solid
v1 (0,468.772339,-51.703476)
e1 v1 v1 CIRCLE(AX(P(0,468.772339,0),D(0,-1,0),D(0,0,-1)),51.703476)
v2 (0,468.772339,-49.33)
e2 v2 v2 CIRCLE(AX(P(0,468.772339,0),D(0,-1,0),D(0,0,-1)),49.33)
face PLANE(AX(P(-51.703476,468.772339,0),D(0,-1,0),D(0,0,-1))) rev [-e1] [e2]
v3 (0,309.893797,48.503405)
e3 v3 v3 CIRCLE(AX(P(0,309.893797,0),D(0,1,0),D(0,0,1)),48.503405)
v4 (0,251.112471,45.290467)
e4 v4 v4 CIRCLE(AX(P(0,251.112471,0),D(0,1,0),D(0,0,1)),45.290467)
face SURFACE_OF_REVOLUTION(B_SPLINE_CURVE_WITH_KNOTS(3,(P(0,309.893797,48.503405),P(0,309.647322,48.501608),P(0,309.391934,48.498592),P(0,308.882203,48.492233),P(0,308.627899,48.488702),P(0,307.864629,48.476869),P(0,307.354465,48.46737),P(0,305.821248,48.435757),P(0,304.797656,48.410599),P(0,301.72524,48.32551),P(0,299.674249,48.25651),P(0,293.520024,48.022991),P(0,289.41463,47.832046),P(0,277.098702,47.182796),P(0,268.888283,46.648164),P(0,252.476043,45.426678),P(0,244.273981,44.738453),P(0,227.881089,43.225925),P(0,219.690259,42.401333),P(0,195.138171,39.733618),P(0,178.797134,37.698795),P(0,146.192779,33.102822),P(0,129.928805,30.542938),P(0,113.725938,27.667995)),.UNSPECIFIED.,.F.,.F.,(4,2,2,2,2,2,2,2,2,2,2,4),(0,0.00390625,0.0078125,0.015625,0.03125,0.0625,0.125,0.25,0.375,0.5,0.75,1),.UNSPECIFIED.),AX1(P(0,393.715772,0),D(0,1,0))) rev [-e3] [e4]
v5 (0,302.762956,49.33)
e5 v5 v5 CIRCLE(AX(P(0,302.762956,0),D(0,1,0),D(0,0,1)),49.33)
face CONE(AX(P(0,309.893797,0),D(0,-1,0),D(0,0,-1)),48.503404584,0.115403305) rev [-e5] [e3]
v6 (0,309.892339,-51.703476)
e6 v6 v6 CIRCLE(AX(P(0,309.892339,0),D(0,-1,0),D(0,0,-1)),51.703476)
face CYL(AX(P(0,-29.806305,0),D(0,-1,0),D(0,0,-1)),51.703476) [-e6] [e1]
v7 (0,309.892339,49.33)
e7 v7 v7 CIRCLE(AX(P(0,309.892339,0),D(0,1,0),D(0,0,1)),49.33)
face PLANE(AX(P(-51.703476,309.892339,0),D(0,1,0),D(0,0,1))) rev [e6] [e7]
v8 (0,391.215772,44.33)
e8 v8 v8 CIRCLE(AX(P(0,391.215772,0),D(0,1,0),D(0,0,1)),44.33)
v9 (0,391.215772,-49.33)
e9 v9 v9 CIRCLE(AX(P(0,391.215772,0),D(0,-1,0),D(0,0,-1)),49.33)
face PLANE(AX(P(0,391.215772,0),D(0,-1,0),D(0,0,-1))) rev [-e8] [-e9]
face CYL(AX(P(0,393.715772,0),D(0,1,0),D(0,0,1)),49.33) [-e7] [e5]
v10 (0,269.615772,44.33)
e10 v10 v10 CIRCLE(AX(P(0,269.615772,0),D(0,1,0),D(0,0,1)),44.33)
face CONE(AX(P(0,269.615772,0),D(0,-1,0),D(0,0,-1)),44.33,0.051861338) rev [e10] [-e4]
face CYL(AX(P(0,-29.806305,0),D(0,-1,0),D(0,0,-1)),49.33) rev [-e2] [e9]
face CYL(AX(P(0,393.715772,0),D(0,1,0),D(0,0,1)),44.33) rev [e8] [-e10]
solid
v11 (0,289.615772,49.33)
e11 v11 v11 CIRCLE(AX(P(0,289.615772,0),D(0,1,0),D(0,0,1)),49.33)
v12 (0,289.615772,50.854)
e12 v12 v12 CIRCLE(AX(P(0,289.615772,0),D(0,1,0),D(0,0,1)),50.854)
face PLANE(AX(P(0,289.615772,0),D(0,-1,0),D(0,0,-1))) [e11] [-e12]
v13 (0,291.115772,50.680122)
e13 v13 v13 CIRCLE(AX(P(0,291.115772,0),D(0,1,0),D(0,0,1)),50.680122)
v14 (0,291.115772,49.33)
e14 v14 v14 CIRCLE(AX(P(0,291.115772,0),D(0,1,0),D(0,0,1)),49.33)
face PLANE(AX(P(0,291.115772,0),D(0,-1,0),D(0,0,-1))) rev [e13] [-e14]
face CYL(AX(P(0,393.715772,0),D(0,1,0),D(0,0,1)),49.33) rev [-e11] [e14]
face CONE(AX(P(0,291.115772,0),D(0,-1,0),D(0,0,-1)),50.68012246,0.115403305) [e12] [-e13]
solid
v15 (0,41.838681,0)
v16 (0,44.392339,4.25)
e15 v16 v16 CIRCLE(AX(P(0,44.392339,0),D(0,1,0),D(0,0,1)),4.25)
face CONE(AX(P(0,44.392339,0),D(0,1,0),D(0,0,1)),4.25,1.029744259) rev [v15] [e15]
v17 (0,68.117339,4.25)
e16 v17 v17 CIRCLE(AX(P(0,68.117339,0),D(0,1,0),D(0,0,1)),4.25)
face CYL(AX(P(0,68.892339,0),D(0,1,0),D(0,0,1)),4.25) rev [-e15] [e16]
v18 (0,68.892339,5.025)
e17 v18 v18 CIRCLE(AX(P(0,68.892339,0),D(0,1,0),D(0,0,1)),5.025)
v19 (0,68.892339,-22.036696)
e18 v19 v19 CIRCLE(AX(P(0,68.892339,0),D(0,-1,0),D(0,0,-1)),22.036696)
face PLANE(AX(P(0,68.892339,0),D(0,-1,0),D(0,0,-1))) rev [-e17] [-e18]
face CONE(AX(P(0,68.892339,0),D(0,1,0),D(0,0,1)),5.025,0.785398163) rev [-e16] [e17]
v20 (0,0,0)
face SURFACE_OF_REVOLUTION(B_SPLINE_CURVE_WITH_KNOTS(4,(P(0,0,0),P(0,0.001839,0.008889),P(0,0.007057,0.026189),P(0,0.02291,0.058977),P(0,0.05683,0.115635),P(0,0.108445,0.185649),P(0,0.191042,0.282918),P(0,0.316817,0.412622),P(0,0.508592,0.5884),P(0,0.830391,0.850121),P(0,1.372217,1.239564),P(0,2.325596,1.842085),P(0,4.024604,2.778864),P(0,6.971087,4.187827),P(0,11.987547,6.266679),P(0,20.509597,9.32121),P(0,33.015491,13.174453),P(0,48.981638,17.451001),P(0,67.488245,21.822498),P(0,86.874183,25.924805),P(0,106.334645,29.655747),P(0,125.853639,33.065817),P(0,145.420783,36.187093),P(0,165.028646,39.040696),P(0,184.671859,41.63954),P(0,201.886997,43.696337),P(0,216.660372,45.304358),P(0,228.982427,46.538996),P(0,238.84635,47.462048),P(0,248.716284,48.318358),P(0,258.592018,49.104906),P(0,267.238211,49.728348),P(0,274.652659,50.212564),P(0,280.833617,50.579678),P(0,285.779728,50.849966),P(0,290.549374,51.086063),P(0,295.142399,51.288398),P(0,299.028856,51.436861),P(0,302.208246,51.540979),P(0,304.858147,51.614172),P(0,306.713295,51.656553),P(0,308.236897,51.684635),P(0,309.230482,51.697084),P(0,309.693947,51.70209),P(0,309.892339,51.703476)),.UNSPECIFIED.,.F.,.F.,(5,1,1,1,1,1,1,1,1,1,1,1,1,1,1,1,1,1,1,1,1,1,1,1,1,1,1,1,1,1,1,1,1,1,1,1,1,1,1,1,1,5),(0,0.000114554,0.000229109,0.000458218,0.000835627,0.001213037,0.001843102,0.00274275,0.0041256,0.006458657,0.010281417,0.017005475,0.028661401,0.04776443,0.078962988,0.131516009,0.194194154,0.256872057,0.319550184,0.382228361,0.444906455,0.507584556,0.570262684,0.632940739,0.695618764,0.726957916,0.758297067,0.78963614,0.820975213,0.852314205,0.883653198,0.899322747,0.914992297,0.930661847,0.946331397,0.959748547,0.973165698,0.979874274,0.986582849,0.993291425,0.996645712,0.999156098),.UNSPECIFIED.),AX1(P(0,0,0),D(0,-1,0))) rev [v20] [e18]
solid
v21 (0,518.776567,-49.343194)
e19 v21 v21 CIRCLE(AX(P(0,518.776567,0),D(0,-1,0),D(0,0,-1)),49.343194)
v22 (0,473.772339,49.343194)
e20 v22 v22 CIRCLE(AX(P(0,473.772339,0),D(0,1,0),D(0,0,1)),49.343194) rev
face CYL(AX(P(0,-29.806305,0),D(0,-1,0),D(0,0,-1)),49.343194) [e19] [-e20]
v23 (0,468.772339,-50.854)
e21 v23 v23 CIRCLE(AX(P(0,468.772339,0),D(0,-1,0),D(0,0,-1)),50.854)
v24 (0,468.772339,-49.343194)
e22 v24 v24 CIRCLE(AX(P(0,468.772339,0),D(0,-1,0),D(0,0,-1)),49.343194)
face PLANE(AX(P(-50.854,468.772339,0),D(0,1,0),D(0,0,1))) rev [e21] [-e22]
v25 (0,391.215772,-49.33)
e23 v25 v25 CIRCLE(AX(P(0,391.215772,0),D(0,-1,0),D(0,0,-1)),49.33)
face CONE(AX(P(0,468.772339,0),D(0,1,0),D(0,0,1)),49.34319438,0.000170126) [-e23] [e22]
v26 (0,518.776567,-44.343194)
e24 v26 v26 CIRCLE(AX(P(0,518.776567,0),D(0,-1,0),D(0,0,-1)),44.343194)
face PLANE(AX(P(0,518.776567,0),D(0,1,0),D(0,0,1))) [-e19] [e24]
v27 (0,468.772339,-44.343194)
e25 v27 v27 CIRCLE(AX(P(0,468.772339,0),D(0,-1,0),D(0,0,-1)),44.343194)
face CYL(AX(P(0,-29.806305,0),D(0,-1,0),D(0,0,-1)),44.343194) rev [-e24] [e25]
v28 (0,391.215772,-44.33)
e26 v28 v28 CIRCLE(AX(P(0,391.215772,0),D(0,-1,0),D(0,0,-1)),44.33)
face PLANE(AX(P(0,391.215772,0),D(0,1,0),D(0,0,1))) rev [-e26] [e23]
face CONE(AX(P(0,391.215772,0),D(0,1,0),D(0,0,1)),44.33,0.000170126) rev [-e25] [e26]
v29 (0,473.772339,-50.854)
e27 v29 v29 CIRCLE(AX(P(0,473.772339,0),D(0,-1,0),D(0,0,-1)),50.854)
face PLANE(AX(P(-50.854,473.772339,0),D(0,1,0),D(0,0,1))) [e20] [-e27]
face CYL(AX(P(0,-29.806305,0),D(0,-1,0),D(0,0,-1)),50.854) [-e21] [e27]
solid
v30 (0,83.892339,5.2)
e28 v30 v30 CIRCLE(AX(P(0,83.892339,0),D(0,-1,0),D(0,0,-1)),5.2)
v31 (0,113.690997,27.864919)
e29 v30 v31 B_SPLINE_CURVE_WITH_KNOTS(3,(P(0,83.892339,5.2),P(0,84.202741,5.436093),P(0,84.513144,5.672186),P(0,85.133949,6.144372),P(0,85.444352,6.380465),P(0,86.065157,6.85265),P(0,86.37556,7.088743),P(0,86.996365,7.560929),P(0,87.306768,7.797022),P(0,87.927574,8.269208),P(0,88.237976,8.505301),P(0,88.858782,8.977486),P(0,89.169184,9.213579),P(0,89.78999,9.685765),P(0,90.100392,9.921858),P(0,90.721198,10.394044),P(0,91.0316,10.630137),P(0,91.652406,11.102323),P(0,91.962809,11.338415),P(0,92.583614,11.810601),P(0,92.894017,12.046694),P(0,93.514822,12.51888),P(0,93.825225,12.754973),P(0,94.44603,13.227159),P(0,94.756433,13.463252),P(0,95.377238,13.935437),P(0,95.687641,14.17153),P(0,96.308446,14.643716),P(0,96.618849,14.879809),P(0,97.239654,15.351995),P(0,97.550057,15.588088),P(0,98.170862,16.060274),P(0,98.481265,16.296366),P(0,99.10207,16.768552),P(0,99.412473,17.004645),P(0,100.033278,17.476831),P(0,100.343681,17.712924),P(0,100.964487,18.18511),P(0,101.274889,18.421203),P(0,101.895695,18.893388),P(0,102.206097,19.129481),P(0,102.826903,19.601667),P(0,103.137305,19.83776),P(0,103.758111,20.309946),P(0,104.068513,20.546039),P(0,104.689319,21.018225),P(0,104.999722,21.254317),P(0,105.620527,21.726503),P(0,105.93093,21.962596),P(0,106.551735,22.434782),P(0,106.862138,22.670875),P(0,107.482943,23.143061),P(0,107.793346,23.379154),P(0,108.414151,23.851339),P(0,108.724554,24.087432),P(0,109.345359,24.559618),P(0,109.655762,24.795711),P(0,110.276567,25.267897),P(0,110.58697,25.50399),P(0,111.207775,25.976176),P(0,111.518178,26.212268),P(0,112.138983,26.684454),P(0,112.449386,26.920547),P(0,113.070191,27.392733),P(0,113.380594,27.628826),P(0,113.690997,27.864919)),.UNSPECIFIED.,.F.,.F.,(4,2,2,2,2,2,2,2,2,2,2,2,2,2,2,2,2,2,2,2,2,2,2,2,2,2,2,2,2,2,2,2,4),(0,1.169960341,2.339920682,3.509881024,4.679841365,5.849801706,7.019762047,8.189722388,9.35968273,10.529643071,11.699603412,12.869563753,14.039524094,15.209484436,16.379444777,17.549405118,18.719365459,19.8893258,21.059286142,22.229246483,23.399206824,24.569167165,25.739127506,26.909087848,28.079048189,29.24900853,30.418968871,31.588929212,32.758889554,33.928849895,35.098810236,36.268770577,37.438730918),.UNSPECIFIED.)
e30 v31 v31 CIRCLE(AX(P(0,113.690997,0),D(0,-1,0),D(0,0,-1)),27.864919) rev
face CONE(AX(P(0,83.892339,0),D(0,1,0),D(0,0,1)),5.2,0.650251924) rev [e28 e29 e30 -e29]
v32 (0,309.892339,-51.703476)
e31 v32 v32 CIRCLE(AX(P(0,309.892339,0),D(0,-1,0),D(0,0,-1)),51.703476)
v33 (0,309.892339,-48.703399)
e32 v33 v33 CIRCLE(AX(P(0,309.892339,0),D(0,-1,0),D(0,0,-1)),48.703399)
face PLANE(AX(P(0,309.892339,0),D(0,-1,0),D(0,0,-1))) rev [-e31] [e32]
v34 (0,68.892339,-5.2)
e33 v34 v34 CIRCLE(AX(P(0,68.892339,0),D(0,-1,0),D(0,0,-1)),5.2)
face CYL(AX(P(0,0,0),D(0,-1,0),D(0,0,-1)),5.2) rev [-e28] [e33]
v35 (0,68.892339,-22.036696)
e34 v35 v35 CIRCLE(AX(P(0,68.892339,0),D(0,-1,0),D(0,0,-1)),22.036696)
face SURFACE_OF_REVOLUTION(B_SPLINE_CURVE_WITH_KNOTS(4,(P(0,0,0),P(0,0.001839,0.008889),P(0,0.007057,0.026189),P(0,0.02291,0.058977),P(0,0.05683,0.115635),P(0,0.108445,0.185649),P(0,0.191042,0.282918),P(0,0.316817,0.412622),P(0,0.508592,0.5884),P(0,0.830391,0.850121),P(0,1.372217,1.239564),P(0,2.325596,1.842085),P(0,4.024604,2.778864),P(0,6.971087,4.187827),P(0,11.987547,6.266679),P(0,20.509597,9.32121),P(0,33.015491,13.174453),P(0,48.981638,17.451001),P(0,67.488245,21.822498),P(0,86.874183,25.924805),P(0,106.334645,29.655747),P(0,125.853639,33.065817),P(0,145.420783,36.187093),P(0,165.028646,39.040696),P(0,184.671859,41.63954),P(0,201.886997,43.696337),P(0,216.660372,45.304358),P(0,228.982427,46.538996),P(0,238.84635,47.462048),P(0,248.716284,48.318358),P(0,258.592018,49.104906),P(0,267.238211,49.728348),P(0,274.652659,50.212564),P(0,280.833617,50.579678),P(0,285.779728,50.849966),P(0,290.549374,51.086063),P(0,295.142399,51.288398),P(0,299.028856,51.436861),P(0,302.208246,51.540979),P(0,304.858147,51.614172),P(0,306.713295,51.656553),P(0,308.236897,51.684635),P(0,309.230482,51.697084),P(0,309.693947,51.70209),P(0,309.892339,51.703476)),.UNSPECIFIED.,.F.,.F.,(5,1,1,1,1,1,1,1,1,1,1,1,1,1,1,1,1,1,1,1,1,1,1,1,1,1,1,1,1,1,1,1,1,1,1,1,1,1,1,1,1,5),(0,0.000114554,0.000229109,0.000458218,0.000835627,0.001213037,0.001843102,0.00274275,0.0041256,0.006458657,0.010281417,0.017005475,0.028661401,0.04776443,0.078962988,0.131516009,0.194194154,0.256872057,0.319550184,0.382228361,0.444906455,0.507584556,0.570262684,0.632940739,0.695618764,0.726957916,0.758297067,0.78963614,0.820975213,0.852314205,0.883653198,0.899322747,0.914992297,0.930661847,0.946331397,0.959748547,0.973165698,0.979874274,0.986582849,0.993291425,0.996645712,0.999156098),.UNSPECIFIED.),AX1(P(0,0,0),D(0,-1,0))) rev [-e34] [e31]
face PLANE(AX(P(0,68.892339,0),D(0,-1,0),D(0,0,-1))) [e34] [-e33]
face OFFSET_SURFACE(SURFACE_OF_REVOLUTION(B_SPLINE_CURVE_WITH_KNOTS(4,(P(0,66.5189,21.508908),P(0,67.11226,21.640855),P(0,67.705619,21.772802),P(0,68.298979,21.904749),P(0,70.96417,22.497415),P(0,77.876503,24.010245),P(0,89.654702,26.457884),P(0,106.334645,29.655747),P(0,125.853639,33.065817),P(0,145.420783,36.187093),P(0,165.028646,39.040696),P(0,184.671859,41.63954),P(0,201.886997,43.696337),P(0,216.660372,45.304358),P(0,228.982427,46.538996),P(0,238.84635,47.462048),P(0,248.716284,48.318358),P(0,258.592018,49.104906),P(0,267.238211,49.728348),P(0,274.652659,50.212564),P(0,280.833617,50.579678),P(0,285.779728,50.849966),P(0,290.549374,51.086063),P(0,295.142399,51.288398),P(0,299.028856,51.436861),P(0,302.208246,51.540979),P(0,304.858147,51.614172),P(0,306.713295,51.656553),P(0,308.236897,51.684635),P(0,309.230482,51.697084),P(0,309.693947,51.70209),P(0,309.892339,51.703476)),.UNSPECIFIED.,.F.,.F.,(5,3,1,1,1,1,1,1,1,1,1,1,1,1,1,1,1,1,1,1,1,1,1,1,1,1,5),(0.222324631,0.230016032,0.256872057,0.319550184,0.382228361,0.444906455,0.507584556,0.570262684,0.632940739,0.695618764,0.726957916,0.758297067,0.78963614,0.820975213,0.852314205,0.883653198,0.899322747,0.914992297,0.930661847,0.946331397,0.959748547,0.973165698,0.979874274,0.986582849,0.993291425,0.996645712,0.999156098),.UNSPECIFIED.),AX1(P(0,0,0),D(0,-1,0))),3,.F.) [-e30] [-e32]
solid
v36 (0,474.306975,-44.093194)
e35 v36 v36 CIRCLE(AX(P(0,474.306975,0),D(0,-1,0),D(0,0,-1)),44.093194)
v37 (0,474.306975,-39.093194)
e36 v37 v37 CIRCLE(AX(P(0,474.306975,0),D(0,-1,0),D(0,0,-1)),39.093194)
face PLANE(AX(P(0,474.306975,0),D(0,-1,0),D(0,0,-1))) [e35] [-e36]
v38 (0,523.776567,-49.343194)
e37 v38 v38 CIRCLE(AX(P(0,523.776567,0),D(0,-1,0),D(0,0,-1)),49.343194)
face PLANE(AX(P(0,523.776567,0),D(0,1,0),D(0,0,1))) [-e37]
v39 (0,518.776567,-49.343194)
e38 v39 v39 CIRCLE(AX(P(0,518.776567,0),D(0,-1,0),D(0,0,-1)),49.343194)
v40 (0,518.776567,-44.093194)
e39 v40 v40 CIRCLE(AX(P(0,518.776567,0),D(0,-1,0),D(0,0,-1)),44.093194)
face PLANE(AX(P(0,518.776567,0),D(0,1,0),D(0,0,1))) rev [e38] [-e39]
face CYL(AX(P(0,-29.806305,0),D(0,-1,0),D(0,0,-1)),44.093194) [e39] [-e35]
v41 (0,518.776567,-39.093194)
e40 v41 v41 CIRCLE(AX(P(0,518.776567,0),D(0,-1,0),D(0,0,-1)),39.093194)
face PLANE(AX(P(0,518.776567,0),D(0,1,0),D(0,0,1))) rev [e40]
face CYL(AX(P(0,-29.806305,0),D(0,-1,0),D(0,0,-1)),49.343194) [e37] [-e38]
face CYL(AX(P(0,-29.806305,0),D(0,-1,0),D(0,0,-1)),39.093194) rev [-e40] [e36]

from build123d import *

# Parameters (mm, degrees)
SHELL3_T              = -3
REVOLVE10_START       = 309.892338598
REVOLVE10_OUTLINE_R   = 51.703475653
REVOLVE10_OUTLINE_R_2 = 49.33
REVOLVE10_DEPTH       = 158.88
SKETCH19_W            = 5
SKETCH19_H            = 49.34319438
SKETCH19_W_2          = 44.469592032
SKETCH19_H_2          = 5


# Read off the part's stored shape, not the designer's step: Revolve6, Revolve10, Revolve12
with BuildPart() as part:
    # Sketch1 → Revolve2 (revolve)
    with BuildSketch(Plane.YZ):
        with BuildLine():
            Line((68.892338598, 22.03669608), (68.892338598, 0))
            Line((68.892338598, 0), (309.892338598, 0))
            Line((309.892338598, 0), (309.892338598, 51.703475653))
            add(Edge.make_bspline(
                [(68.892338598, 22.036696078), (70.96416969, 22.497415108), (77.876502823, 24.010245465), (89.654701691, 26.457883592), (106.334645431, 29.655747436), (125.853639326, 33.065816617), (145.420783183, 36.187092783), (165.028645768, 39.040695578), (184.671859186, 41.639540014), (201.886997195, 43.696336538), (216.660371523, 45.304357577), (228.982426726, 46.53899565), (238.846350049, 47.46204834), (248.71628369, 48.318358048), (258.592017893, 49.104905531), (267.23821101, 49.728348294), (274.652658501, 50.212563982), (280.833617265, 50.579677684), (285.779727539, 50.849965544), (290.549374247, 51.086062909), (295.142398502, 51.288398084), (299.028855922, 51.436861373), (302.20824599, 51.540979), (304.858146787, 51.614171697), (306.713295392, 51.656552534), (308.236897063, 51.68463502), (309.230482405, 51.697083627), (309.693947311, 51.702090464), (309.892338598, 51.703475653)],
                knots=[0.230016032, 0.230016032, 0.230016032, 0.230016032, 0.230016032, 0.256872057, 0.319550184, 0.382228361, 0.444906455, 0.507584556, 0.570262684, 0.632940739, 0.695618764, 0.726957916, 0.758297067, 0.78963614, 0.820975213, 0.852314205, 0.883653198, 0.899322747, 0.914992297, 0.930661847, 0.946331397, 0.959748547, 0.973165698, 0.979874274, 0.986582849, 0.993291425, 0.996645712, 0.999156098, 0.999156098, 0.999156098, 0.999156098, 0.999156098], degree=4))
        make_face()
    revolve(axis=Axis((0, 0, 0), (0, 1, 0)))

    # Shell3
    shell3_openings = [part.faces().sort_by_distance(p)[0] for p in [
        (0, 309.892338598, 0),
        (0, 68.892338598, 0),
    ]]
    offset(amount=SHELL3_T, openings=shell3_openings, kind=Kind.INTERSECTION)

    # Sketch4 → Revolve5 (revolve)
    with BuildSketch(Plane(origin=(0, 0, 0), x_dir=(0, 1, 0), z_dir=(0, 0, 1)), mode=Mode.PRIVATE) as revolve5_sk:
        with BuildLine():
            add(Edge.make_bspline(
                [(118.892338598, 31.821069636), (118.193769239, 31.700420222), (112.61470459, 30.732647056), (102.165796478, 28.856499456), (89.654701691, 26.457883592), (77.876502823, 24.010245465), (70.96416969, 22.497415108), (68.892338598, 22.036696078)],
                knots=[0.607957601, 0.607957601, 0.607957601, 0.607957601, 0.607957601, 0.616927738, 0.679605914, 0.742284041, 0.769140067, 0.769140067, 0.769140067, 0.769140067, 0.769140067], degree=4))
            Line((68.892338598, 22.036696078), (68.892338598, 5.2))
            Line((68.892338598, 5.2), (83.892338598, 5.2))
            Line((83.892338598, 5.2), (118.892338598, 31.821069636))
        make_face()
    revolve(revolve5_sk.sketch.rotate(Axis((0, 0, 0), (0, 1, 0)), 90), axis=Axis((0, 0, 0), (0, 1, 0)))


with BuildPart() as body_2:
    # Sketch1<3> → Revolve3 (revolve)
    with BuildSketch(Plane.YZ):
        with BuildLine():
            add(Edge.make_bspline(
                [(0, 0), (0.001839143, 0.008888702), (0.007057294, 0.026188991), (0.022910311, 0.058976608), (0.056830094, 0.115635308), (0.108445486, 0.185649019), (0.191042047, 0.282917967), (0.316816673, 0.41262197), (0.508591814, 0.58839974), (0.830391435, 0.850120888), (1.372217083, 1.239564322), (2.325596475, 1.842085487), (4.024603962, 2.778864407), (6.971087135, 4.18782688), (11.987547002, 6.266678684), (20.509596689, 9.321209841), (33.015491366, 13.174452663), (46.931080328, 16.901757504), (58.537509164, 19.698426631), (66.128829141, 21.422166545), (68.892338598, 22.036696078)],
                knots=[0, 0, 0, 0, 0, 0.000114554, 0.000229109, 0.000458218, 0.000835627, 0.001213037, 0.001843102, 0.00274275, 0.0041256, 0.006458657, 0.010281417, 0.017005475, 0.028661401, 0.04776443, 0.078962988, 0.131516009, 0.194194154, 0.230016032, 0.230016032, 0.230016032, 0.230016032, 0.230016032], degree=4))
            Line((0, 0), (68.892338598, 0))
            Line((68.892338598, 0), (68.892338598, 22.03669608))
        make_face()
    revolve(axis=Axis((0, 0, 0), (0, 1, 0)))

    # Sketch6 → M10x1.5 Tapped Hole1 (revolve, cut)
    with BuildSketch(Plane(origin=(0, 68.892338598, 0), x_dir=(0, 0, 1), z_dir=(1, 0, 0))):
        Polygon((0, 0), (0, 27.053657631), (4.25, 24.5), (4.25, 0.775), (5.025, 0), align=None)
    revolve(axis=Axis((0, 75.242338598, 0), (0, -1, 0)), mode=Mode.SUBTRACT)


with BuildPart() as body_3:
    # Revolve6 outline → Revolve6 (revolve)
    with BuildSketch(Plane.XY):
        Polygon((50.68012246, 291.115771676), (49.33, 291.115771676), (49.33, 289.615771676), (50.854, 289.615771676), align=None)
    revolve(axis=Axis((0, 0, 0), (0, 1, 0)))


with BuildPart() as body_4:
    # Revolve6 2 outline → Revolve6 2 (revolve)
    with BuildSketch(Plane.XY):
        with BuildLine():
            Line((49.33, 302.762955592), (49.33, 391.215771676))
            Line((49.33, 391.215771676), (44.33, 391.215771676))
            Line((44.33, 391.215771676), (44.33, 269.615771676))
            Line((44.33, 269.615771676), (45.290467176, 251.112470655))
            add(Edge.make_bspline(
                [(48.503404584, 309.893796776), (48.501607518, 309.647322483), (48.498591794, 309.391933612), (48.492233128, 308.882202851), (48.48870164, 308.627899118), (48.476869482, 307.864628655), (48.467370215, 307.354464604), (48.435756692, 305.821248175), (48.41059902, 304.797655619), (48.325509692, 301.725239655), (48.25650989, 299.674249317), (48.022990749, 293.520023966), (47.832046231, 289.414629796), (47.182795728, 277.098702182), (46.648163913, 268.888283124), (45.799963937, 257.491621794), (45.550794374, 254.301693735), (45.290467176, 251.112470655)],
                knots=[0, 0, 0, 0, 0.00390625, 0.00390625, 0.0078125, 0.0078125, 0.015625, 0.015625, 0.03125, 0.03125, 0.0625, 0.0625, 0.125, 0.125, 0.25, 0.25, 0.298600031, 0.298600031, 0.298600031, 0.298600031], degree=3))
            Line((48.503404584, 309.893796776), (49.33, 302.762955592))
        make_face()
    revolve(axis=Axis((0, 0, 0), (0, 1, 0)))

    # Revolve10 outline → Revolve10 (add)
    with BuildSketch(Plane(origin=(0, 0, 0), x_dir=(1, 0, 0), z_dir=(0, 1, 0)).offset(REVOLVE10_START)):
        Circle(REVOLVE10_OUTLINE_R)
        Circle(REVOLVE10_OUTLINE_R_2, mode=Mode.SUBTRACT)
    extrude(amount=REVOLVE10_DEPTH)


with BuildPart() as body_5:
    # Sketch19 → Revolve11 (revolve)
    with BuildSketch(Plane(origin=(0, 0, 0), x_dir=(0, 1, 0), z_dir=(0, 0, 1)), mode=Mode.PRIVATE) as revolve11_sk:
        with Locations((521.276566922, 24.67159719)):
            Rectangle(SKETCH19_W, SKETCH19_H)
        with Locations((496.541770906, 41.59319438)):
            Rectangle(SKETCH19_W_2, SKETCH19_H_2)
    revolve(revolve11_sk.sketch.rotate(Axis((0, -29.806304847, 0), (0, 1, 0)), 270), axis=Axis((0, -29.806304847, 0), (0, 1, 0)))


with BuildPart() as body_6:
    # Revolve12 outline → Revolve12 (revolve)
    with BuildSketch(Plane.XY):
        Polygon((49.34319438, 518.776566922), (44.34319438, 518.776566922), (44.34319438, 468.772338598), (44.33, 391.215771676), (49.33, 391.215771676), (49.34319438, 468.772338598), (50.854, 468.772338598), (50.854, 473.772338598), (49.34319438, 473.772338598), align=None)
    revolve(axis=Axis((0, 0, 0), (0, 1, 0)))


solid = Compound([part.part, body_2.part, body_3.part, body_4.part, body_5.part, body_6.part])
